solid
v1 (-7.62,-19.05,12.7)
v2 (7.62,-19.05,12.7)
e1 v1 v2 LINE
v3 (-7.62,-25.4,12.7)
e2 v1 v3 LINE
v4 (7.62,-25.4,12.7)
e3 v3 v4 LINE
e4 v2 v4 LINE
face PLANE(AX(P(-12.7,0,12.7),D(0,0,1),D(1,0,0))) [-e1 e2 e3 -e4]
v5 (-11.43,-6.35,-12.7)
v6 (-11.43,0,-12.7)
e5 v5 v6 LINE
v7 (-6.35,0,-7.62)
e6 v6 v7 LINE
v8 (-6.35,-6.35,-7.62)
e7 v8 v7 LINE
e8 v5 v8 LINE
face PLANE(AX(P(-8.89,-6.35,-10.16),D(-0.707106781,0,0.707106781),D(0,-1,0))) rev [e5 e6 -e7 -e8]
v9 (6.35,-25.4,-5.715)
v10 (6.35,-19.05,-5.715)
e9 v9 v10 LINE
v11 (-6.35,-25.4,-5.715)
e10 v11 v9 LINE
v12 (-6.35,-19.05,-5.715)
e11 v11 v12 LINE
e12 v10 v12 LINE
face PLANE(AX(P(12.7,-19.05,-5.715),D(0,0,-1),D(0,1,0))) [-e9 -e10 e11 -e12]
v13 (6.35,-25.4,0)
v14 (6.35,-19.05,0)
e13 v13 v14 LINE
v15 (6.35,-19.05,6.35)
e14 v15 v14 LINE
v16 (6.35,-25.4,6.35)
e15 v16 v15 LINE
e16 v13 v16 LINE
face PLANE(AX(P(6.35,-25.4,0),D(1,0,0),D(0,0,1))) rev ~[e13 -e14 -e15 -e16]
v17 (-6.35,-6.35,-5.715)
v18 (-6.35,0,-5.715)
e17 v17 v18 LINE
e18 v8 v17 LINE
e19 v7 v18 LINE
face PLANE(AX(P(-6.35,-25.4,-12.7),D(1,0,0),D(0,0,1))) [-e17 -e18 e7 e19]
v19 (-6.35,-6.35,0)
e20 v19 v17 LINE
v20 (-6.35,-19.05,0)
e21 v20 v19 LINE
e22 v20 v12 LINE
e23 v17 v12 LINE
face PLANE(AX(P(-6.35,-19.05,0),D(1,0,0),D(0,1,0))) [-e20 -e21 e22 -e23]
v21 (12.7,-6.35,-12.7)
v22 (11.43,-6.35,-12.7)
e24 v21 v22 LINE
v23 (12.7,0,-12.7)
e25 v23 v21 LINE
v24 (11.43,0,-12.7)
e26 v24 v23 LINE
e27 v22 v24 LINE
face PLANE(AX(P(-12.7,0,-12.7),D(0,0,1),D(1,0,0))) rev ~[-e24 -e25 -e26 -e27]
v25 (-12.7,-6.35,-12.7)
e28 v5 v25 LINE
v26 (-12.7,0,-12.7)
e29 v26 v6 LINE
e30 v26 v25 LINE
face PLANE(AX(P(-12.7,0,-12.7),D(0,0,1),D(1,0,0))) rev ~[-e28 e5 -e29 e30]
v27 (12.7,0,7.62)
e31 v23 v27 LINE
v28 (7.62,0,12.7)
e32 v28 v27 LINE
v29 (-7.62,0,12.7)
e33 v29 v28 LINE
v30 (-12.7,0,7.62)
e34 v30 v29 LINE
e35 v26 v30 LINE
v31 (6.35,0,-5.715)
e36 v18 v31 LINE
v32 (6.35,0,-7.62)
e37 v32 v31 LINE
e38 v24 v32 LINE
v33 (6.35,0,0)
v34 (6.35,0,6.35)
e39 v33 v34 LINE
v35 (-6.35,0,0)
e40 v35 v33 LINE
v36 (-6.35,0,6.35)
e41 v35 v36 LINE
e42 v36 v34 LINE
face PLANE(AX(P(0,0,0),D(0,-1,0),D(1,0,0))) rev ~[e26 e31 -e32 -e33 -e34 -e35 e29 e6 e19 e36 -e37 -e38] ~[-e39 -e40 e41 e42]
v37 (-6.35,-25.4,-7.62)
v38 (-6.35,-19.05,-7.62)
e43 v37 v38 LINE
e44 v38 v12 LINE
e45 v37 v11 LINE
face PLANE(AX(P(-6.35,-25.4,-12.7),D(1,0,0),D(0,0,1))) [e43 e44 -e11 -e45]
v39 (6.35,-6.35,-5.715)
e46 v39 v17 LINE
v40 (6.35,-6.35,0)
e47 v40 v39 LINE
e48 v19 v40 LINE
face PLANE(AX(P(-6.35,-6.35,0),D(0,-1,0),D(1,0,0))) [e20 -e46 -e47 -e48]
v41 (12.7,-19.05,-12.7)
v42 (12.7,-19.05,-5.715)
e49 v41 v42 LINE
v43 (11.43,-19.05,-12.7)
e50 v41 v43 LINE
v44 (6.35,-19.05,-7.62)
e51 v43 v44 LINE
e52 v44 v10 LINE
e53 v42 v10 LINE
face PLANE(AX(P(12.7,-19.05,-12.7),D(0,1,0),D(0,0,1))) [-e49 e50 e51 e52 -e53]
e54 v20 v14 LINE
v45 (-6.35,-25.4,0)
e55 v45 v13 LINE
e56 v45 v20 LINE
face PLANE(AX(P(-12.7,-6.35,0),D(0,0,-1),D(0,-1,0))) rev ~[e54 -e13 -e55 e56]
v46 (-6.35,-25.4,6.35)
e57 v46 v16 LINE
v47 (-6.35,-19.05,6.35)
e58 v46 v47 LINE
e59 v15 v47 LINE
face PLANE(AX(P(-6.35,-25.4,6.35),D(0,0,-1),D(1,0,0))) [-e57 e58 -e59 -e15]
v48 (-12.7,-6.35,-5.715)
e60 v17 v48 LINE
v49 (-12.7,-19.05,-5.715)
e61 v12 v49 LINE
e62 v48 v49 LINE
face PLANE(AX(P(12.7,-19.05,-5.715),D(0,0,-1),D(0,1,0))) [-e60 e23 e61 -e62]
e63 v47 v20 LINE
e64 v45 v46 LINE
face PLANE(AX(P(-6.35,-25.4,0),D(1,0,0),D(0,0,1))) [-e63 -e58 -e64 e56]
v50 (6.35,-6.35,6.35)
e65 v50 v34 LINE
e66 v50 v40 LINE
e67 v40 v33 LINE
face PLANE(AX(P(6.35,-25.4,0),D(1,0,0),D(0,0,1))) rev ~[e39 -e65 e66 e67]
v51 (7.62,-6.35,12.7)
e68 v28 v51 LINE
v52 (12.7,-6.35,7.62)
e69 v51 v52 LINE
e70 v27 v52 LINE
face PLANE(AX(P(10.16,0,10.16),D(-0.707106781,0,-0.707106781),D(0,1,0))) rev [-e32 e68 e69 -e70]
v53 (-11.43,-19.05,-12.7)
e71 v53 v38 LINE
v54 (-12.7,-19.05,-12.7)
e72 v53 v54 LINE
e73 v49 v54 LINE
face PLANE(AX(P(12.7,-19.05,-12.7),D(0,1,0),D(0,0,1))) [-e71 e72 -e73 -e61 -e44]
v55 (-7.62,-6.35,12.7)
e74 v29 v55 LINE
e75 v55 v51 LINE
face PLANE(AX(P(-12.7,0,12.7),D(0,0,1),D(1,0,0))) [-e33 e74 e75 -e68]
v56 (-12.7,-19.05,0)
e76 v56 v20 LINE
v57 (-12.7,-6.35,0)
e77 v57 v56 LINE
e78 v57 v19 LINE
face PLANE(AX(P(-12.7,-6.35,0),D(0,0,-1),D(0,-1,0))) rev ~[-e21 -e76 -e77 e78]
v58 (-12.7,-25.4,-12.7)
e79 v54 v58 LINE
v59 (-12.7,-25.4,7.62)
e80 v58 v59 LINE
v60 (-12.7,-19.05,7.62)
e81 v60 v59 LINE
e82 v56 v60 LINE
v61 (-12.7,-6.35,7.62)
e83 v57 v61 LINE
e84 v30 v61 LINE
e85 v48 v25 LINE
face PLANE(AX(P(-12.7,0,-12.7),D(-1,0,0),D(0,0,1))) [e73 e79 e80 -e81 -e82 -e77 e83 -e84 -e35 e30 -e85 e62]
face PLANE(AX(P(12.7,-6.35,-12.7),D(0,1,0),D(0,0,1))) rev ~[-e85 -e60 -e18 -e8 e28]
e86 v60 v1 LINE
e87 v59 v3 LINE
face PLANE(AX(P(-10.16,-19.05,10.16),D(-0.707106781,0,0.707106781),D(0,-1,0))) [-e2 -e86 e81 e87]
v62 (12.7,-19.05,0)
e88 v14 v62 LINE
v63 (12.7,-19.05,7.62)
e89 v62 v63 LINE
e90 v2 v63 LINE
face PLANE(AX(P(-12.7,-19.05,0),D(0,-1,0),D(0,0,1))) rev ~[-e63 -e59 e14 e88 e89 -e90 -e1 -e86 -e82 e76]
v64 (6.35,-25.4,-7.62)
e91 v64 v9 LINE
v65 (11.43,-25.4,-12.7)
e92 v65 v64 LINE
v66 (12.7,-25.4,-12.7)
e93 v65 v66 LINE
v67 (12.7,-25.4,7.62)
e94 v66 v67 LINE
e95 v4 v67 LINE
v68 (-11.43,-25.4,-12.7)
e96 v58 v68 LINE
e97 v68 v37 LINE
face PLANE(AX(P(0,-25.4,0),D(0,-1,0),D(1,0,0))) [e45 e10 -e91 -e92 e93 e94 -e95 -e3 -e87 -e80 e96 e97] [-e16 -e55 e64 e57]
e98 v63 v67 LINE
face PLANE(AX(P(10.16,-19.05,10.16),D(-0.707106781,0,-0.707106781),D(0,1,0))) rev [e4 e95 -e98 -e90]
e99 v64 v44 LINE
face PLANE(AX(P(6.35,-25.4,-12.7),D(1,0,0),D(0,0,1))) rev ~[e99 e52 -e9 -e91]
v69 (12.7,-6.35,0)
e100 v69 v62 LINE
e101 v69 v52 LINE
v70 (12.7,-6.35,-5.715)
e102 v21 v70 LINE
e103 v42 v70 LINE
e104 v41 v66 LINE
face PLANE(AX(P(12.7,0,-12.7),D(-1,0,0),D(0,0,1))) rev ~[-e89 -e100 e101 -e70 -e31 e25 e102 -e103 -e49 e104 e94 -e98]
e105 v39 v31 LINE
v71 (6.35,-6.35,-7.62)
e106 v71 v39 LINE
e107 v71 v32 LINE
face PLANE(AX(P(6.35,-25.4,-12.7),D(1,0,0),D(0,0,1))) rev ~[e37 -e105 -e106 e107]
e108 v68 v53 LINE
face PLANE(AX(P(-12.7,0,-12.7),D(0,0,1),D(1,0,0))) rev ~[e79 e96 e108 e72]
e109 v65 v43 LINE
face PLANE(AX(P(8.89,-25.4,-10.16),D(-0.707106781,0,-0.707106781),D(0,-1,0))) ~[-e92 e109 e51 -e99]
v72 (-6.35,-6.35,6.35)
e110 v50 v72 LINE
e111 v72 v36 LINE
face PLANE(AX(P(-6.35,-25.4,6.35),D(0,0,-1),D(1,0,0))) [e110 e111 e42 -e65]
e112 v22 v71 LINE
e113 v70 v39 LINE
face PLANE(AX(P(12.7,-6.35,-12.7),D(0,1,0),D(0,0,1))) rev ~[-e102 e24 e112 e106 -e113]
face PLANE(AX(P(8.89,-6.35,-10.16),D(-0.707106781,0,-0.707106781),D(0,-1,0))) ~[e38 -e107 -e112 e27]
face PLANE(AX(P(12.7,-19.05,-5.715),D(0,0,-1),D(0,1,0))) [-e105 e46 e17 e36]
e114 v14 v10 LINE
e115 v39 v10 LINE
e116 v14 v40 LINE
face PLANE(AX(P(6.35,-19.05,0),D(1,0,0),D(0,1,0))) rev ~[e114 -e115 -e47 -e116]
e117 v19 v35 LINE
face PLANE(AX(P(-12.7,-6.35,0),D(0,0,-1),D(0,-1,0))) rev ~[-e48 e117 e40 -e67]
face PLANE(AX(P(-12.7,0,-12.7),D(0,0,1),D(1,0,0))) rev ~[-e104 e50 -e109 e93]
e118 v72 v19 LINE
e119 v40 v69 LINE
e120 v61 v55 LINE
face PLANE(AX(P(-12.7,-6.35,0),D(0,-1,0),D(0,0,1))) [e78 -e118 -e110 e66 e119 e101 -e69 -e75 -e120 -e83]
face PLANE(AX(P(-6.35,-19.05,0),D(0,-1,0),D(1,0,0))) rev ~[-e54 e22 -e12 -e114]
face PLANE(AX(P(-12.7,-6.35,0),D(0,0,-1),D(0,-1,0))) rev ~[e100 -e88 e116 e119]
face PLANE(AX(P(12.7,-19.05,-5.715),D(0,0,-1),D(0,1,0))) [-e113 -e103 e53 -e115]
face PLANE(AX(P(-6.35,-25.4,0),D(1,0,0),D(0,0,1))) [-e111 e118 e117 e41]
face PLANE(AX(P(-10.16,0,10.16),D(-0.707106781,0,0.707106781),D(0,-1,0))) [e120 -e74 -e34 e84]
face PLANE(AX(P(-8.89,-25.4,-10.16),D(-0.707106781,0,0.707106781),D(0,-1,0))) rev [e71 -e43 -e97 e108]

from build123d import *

# Parameters (mm, degrees)
F0_W     = 25.4
F0_H     = 25.4
F1_DEPTH = 25.4
F2_W     = 12.7
F2_H     = 6.985
F2_H_2   = 6.35
F3_DEPTH = 25.401
F4_W     = 12.7
F4_H     = 12.7
F5_DEPTH = 25.401
F6_W     = 12.7
F6_H     = 6.985
F7_DEPTH = 25.401
F8_W     = 12.7
F8_H     = 12.7
F9_DEPTH = 12.701
F10_SIZE = 5.08


with BuildPart() as f1:
    # F0 (on Front) → F1 (new body)
    with BuildSketch(Plane.XZ):
        Rectangle(F0_W, F0_H)
    extrude(amount=F1_DEPTH)

    # F2 (on face) → F3 (cut, through all)
    with BuildSketch(Plane.XZ.offset(25.4)):
        with Locations((0, -9.2075)):
            Rectangle(F2_W, F2_H)
        with Locations((0, 3.175)):
            Rectangle(F2_W, F2_H_2)
    extrude(amount=-F3_DEPTH, mode=Mode.SUBTRACT)

    # F4 (on face) → F5 (cut, through all)
    with BuildSketch(Plane(origin=(-12.7, 0, 0), x_dir=(0, -1, 0), z_dir=(-1, 0, 0))):
        with Locations((12.7, 6.35)):
            Rectangle(F4_W, F4_H)
    extrude(amount=-F5_DEPTH, mode=Mode.SUBTRACT)

    # F6 (on face) → F7 (cut, through all)
    with BuildSketch(Plane.YZ.offset(12.7)):
        with Locations((-12.7, -9.2075)):
            Rectangle(F6_W, F6_H)
    extrude(amount=-F7_DEPTH, mode=Mode.SUBTRACT)

    # F8 (on face) → F9 (cut, through all)
    with BuildSketch(Plane.XY):
        with Locations((0, -12.7)):
            Rectangle(F8_W, F8_H)
    extrude(amount=-F9_DEPTH, mode=Mode.SUBTRACT)

    # F10
    f10_edges = [f1.edges().sort_by_distance(p)[0] for p in [
        (6.35, -22.225, -12.7),
        (6.35, -3.175, -12.7),
        (-6.35, -3.175, -12.7),
        (-6.35, -22.225, -12.7),
        (12.7, -3.175, 12.7),
        (12.7, -22.225, 12.7),
        (-12.7, -22.225, 12.7),
        (-12.7, -3.175, 12.7),
    ]]
    chamfer(f10_edges, length=F10_SIZE)


solid = f1.part
